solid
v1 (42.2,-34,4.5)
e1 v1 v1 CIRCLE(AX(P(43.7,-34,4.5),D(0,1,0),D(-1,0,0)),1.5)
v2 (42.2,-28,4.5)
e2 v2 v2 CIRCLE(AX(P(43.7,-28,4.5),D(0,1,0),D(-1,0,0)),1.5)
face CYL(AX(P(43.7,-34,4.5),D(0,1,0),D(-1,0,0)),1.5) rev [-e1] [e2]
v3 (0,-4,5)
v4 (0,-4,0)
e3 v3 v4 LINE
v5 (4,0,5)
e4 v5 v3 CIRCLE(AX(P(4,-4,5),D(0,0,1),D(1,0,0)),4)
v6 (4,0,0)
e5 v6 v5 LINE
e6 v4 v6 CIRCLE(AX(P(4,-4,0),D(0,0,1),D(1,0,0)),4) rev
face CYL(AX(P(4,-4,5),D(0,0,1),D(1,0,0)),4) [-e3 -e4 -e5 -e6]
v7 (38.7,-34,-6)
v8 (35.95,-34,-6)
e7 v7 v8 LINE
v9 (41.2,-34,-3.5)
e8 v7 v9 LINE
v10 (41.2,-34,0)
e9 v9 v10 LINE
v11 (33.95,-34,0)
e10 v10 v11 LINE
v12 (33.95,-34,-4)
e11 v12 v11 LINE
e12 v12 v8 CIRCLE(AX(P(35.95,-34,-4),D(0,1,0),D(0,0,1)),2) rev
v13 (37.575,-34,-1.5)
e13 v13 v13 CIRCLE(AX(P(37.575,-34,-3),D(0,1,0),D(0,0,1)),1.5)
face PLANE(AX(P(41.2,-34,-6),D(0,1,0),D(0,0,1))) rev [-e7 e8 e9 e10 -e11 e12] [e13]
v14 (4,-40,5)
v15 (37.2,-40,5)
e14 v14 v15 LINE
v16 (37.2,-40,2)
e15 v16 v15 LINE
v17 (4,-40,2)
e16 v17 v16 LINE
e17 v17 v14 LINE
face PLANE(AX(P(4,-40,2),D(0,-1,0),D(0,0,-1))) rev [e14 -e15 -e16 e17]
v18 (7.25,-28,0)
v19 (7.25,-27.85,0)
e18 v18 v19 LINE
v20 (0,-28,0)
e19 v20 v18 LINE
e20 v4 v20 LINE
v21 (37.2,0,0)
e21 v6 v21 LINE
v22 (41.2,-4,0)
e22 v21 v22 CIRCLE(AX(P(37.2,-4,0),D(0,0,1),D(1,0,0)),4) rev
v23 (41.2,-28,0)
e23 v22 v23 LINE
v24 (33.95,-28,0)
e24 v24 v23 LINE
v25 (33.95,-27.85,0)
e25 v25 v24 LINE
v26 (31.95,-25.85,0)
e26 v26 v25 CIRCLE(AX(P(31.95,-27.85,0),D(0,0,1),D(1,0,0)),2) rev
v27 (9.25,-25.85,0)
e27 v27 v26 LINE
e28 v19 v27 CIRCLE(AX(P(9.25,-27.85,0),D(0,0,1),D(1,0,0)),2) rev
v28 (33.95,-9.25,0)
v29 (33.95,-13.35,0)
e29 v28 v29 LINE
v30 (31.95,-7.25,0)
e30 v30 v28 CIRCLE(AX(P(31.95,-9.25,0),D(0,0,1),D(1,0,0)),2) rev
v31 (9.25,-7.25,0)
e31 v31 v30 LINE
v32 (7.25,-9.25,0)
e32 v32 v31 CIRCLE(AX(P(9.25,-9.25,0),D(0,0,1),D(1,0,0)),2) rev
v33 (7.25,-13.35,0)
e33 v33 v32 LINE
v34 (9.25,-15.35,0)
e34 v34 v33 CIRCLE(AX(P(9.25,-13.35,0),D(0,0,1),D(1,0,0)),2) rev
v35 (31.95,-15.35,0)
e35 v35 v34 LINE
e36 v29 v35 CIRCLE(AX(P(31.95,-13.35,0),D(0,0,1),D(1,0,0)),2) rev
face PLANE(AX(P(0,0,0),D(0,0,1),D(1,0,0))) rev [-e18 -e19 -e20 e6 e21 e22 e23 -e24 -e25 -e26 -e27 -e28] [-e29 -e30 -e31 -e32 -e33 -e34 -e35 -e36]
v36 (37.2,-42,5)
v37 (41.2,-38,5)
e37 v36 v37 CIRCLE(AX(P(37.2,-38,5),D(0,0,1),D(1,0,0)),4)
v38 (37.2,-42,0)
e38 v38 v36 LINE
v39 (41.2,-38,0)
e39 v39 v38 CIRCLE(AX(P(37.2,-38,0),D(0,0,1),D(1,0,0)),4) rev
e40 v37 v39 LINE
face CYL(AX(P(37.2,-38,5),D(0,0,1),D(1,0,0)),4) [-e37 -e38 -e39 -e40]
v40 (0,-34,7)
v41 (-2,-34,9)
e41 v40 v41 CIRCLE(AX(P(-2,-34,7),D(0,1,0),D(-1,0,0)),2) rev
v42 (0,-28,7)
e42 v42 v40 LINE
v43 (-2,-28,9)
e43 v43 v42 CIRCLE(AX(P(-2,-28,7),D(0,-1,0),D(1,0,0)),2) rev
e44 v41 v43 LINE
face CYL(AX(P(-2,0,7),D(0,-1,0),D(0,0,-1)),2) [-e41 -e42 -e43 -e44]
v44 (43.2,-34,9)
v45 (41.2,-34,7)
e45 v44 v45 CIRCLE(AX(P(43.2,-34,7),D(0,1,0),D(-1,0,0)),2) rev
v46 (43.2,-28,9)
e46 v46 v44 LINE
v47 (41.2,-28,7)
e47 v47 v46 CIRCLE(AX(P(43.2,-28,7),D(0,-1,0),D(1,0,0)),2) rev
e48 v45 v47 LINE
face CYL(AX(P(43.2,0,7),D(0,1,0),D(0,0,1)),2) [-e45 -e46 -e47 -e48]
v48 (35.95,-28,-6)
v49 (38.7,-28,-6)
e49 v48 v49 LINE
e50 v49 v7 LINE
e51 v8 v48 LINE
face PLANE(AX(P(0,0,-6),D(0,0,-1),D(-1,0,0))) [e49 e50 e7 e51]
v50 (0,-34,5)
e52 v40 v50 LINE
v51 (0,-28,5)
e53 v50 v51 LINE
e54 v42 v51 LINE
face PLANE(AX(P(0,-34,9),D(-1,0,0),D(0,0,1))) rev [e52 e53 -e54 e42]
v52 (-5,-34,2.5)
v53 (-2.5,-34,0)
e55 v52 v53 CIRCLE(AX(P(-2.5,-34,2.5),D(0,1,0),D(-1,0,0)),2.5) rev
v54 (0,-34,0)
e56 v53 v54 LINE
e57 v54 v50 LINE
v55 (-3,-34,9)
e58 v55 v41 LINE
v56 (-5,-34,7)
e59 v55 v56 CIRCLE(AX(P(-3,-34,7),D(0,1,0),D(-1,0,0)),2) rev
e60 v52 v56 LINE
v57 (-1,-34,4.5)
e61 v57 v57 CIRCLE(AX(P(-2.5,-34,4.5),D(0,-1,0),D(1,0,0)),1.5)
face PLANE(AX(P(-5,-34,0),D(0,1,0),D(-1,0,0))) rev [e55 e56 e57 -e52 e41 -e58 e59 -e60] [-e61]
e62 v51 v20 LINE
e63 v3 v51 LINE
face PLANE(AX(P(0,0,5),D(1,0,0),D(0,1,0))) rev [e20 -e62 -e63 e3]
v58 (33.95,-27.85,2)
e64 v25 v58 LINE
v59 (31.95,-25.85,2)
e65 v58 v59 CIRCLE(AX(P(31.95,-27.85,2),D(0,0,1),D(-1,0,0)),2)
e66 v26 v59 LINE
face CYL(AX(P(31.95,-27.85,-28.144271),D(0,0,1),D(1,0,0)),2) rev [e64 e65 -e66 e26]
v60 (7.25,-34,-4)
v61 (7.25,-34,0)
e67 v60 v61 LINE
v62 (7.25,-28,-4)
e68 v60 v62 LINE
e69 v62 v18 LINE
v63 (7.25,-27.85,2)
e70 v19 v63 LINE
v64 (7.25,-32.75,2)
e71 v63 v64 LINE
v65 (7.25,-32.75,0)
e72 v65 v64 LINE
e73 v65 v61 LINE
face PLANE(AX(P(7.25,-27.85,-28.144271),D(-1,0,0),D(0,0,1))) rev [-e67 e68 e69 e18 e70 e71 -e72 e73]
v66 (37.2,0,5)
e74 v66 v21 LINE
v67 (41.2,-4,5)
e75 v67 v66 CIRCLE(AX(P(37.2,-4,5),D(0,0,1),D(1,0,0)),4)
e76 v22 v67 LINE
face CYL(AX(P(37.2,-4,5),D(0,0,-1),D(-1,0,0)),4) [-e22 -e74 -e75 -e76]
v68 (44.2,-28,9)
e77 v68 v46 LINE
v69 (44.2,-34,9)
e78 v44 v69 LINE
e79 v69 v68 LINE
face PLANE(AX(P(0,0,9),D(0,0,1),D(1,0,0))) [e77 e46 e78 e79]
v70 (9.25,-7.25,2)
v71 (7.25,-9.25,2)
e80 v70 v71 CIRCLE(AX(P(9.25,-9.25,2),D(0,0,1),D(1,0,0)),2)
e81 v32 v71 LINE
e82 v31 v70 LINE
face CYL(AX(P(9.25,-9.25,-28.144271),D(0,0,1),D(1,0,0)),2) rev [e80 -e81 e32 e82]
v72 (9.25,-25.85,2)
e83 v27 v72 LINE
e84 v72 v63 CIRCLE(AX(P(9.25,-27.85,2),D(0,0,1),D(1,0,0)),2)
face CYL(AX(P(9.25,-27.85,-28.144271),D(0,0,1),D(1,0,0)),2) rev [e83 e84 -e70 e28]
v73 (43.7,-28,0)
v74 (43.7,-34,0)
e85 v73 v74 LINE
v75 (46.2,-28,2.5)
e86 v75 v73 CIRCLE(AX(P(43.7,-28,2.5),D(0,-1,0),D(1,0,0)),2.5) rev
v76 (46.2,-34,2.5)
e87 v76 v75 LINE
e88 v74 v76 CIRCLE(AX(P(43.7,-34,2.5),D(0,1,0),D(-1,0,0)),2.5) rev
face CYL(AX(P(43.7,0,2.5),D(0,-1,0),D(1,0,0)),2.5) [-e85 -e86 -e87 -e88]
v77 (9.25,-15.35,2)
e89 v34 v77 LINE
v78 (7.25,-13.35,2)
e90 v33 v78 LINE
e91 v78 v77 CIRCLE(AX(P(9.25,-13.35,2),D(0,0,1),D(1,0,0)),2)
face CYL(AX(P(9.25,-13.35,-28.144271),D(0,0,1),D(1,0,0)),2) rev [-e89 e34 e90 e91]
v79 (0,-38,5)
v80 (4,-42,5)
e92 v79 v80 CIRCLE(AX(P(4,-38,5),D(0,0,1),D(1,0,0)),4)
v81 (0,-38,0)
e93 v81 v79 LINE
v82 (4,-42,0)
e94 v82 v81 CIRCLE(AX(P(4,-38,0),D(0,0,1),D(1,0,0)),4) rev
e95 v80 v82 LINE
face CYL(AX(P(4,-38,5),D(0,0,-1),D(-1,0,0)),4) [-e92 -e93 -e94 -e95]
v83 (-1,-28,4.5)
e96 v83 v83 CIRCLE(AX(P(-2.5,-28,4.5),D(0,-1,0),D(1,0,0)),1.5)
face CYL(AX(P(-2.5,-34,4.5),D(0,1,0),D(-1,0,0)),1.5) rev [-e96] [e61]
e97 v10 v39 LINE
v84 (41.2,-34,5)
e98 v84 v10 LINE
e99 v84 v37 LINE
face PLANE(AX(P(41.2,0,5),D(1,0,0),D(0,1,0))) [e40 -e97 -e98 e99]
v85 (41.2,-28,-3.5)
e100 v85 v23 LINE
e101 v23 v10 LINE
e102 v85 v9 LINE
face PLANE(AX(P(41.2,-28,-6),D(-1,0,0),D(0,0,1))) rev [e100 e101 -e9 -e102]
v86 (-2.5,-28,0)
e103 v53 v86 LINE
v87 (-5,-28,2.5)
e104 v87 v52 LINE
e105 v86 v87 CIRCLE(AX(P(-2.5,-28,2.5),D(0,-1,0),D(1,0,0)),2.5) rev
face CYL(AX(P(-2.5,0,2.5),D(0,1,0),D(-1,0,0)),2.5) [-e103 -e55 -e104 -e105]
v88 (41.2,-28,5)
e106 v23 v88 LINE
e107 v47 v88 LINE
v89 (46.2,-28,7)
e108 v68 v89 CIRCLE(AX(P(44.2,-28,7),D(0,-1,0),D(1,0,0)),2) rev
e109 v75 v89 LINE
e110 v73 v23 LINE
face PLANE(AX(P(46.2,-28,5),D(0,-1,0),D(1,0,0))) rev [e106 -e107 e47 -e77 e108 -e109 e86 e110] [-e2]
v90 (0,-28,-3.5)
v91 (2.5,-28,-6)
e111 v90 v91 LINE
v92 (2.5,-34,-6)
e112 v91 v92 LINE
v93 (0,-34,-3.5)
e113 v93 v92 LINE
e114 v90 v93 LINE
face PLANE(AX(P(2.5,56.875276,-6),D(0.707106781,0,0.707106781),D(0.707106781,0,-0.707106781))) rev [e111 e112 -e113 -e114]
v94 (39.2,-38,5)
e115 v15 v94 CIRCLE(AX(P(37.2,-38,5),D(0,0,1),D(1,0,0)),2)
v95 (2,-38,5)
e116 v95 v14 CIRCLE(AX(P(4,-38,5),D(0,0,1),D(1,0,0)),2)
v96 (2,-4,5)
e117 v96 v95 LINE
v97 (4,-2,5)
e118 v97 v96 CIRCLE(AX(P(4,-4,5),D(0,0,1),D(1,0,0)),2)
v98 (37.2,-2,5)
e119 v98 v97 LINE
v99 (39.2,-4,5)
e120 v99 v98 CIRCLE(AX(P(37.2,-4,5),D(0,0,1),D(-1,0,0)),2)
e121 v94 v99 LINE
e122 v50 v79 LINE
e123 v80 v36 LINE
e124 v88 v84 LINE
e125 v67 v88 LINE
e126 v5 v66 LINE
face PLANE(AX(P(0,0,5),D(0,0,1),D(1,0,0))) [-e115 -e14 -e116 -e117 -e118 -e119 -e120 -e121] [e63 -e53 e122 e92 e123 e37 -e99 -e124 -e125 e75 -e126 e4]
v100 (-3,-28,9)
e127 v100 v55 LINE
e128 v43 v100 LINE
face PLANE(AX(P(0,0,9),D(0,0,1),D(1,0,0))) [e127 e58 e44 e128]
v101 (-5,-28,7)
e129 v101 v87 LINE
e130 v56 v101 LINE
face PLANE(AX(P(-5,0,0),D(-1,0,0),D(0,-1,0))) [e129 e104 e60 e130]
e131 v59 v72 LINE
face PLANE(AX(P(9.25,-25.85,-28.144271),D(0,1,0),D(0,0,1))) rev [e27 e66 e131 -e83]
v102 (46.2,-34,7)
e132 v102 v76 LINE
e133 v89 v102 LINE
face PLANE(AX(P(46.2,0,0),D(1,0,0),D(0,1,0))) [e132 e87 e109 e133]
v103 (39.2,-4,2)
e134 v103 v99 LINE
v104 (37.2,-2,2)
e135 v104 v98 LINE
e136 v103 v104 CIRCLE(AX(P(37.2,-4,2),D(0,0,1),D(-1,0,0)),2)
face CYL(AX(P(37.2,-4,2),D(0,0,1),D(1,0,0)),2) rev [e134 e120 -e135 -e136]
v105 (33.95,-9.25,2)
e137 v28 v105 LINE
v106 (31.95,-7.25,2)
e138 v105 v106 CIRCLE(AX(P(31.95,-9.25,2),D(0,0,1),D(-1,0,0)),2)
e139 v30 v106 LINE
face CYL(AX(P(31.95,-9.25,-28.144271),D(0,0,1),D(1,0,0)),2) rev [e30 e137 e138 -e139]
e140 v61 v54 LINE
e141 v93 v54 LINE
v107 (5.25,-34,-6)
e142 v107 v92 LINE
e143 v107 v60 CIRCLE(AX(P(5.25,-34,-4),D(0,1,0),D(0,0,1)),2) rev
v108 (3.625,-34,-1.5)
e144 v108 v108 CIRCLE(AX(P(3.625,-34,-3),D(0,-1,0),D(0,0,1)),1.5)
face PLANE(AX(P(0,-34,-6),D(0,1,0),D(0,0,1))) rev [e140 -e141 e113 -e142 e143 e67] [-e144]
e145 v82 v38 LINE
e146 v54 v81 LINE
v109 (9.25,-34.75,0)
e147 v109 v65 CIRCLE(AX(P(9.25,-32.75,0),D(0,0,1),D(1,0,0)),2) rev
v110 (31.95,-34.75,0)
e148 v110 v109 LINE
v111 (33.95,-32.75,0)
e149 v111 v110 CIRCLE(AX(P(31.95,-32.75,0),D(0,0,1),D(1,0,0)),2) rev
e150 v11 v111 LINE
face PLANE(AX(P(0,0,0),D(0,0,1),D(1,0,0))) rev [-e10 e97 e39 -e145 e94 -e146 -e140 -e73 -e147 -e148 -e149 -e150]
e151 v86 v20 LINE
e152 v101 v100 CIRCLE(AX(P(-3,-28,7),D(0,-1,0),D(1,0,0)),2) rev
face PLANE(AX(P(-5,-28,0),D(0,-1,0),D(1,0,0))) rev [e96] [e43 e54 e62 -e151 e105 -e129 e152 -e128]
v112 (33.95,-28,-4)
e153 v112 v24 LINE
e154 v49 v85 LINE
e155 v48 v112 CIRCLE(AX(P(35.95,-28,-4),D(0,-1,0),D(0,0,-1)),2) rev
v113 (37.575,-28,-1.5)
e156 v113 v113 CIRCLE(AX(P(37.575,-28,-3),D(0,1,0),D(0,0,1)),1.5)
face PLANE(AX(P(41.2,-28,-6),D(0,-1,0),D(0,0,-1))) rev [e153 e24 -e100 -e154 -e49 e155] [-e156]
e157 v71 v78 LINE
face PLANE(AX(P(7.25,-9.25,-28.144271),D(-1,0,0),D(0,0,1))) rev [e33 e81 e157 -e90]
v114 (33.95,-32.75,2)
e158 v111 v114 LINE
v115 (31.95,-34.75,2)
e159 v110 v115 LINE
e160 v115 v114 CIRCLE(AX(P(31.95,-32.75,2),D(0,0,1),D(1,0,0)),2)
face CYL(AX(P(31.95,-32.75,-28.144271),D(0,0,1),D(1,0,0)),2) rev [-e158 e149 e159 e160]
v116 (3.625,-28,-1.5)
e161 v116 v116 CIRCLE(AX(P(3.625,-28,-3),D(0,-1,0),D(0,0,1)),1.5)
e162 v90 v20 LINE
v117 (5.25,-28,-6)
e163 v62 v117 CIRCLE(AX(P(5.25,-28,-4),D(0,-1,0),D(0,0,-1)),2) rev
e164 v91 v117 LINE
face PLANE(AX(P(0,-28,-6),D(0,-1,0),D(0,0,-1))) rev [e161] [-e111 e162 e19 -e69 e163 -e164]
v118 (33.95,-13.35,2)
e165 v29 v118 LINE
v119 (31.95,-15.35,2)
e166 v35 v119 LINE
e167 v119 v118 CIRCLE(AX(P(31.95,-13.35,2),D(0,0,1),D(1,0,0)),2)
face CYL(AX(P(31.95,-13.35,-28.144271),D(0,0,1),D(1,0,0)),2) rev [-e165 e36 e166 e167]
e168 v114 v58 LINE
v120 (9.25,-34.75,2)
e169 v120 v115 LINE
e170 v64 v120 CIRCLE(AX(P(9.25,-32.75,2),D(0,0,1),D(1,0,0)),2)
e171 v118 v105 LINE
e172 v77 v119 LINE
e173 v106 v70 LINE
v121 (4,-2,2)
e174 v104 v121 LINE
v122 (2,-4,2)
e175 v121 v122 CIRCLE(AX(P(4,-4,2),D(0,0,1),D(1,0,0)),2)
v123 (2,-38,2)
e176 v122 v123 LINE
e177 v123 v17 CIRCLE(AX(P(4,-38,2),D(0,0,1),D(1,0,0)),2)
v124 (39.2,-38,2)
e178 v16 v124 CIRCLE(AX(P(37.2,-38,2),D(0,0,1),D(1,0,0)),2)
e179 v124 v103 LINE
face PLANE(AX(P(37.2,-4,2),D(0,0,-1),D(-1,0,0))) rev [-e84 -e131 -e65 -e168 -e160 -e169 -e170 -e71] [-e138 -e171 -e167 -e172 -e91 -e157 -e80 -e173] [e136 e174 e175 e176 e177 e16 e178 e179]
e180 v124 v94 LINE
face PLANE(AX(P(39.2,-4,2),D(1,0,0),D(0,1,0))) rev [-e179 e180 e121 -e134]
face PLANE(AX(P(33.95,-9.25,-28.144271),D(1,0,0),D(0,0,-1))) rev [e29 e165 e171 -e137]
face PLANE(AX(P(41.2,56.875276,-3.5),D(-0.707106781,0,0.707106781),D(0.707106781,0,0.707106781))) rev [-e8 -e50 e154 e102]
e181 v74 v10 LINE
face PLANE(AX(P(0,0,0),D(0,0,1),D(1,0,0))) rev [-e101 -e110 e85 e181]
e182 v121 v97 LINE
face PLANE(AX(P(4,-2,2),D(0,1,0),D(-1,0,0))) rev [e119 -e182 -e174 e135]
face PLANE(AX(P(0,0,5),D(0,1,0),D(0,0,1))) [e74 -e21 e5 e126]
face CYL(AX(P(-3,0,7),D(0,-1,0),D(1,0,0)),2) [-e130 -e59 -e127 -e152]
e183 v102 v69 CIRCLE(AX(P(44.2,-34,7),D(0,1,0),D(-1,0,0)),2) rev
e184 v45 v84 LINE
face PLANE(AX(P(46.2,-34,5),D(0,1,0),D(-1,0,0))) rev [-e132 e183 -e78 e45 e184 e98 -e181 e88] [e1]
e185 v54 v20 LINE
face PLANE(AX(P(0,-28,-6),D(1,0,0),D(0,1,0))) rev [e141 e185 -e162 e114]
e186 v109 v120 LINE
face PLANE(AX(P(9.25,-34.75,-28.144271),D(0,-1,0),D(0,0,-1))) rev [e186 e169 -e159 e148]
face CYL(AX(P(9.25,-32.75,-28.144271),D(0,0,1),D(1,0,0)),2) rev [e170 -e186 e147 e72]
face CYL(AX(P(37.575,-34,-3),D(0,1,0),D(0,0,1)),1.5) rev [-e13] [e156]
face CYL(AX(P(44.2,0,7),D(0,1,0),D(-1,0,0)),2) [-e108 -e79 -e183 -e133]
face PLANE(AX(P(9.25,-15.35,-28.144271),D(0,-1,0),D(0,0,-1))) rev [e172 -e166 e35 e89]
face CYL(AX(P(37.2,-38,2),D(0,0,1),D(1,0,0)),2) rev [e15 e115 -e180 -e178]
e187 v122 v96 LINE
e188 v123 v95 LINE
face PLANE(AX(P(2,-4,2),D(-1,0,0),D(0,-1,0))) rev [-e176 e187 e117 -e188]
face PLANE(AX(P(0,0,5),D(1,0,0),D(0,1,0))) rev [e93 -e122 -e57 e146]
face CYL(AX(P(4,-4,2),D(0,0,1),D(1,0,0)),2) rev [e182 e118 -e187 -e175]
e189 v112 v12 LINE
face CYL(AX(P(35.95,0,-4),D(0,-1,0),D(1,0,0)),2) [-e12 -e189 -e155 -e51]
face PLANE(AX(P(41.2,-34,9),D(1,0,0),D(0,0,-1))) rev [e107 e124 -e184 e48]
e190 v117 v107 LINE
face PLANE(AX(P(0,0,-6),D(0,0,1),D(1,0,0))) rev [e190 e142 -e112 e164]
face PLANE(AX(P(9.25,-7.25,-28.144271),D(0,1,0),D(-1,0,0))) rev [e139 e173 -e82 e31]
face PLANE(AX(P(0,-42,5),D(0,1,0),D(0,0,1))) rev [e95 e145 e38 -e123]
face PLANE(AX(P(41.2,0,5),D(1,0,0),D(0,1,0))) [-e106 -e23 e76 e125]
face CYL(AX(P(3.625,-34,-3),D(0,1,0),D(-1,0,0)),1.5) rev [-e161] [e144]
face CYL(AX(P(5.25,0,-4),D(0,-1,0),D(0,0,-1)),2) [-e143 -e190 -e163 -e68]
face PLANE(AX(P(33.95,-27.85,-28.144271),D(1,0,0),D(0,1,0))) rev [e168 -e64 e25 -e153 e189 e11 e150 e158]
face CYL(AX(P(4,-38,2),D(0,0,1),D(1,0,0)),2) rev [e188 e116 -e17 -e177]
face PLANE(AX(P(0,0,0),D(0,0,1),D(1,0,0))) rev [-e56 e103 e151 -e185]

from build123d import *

# Parameters (mm, degrees)
SKETCH1_W           = 41.2
SKETCH1_H           = 42
BOSS_EXTRUDE1_DEPTH = 5
CUT_EXTRUDE1_DEPTH  = 3
FILLET1_R           = 4
CUT_EXTRUDE2_DEPTH  = 2
SKETCH6_W           = 5
SKETCH6_H           = 6
BOSS_EXTRUDE2_DEPTH = 5
SKETCH7_W           = 5
SKETCH7_H           = 6
BOSS_EXTRUDE3_DEPTH = 5
SKETCH8_W           = 7.25
SKETCH8_H           = 6
BOSS_EXTRUDE4_DEPTH = 6
SKETCH9_W           = 7.25
SKETCH9_H           = 6
BOSS_EXTRUDE5_DEPTH = 6
SKETCH13_W          = 5
SKETCH13_H          = 6
BOSS_EXTRUDE6_DEPTH = 4
SKETCH10_R          = 1.5
CUT_EXTRUDE3_DEPTH  = 6
SKETCH12_R          = 1.5
CUT_EXTRUDE4_DEPTH  = 6
FILLET3_R           = 2
FILLET4_R           = 2.5
FILLET6_R           = 2
CUT_EXTRUDE6_START  = -6
CUT_EXTRUDE6_DEPTH  = 6
CUT_EXTRUDE7_START  = -6
CUT_EXTRUDE7_DEPTH  = 6


# Read off the part's stored shape, not the designer's step: Cut-Extrude6, Cut-Extrude7
with BuildPart() as part:
    # Sketch1 → Boss-Extrude1 (new body)
    with BuildSketch(Plane.XY):
        with Locations((20.6, -21)):
            Rectangle(SKETCH1_W, SKETCH1_H)
    extrude(amount=BOSS_EXTRUDE1_DEPTH)

    # Sketch2 → Cut-Extrude1 (cut)
    with BuildSketch(Plane.XY.offset(5)):
        with BuildLine():
            Line((4, -2), (37.2, -2))
            ThreePointArc((37.2, -2), (38.614213562, -2.585786438), (39.2, -4))
            Line((39.2, -4), (39.2, -38))
            ThreePointArc((39.2, -38), (38.614213562, -39.414213562), (37.2, -40))
            Line((37.2, -40), (4, -40))
            ThreePointArc((4, -40), (2.585786438, -39.414213562), (2, -38))
            Line((2, -38), (2, -4))
            ThreePointArc((2, -4), (2.585786438, -2.585786438), (4, -2))
        make_face()
    extrude(amount=-CUT_EXTRUDE1_DEPTH, mode=Mode.SUBTRACT)

    # Fillet1
    fillet1_edges = [part.edges().sort_by_distance(p)[0] for p in [
        (0, 0, 2.5),
        (41.2, 0, 2.5),
        (41.2, -42, 2.5),
        (0, -42, 2.5),
    ]]
    fillet(fillet1_edges, radius=FILLET1_R)

    # Sketch3 → Cut-Extrude2 (cut)
    with BuildSketch(Plane.XY.offset(2)):
        with BuildLine():
            Line((9.25, -7.25), (31.95, -7.25))
            ThreePointArc((31.95, -7.25), (33.364213562, -7.835786438), (33.95, -9.25))
            Line((33.95, -9.25), (33.95, -13.35))
            ThreePointArc((33.95, -13.35), (33.364213562, -14.764213562), (31.95, -15.35))
            Line((31.95, -15.35), (9.25, -15.35))
            ThreePointArc((9.25, -15.35), (7.835786438, -14.764213562), (7.25, -13.35))
            Line((7.25, -13.35), (7.25, -9.25))
            ThreePointArc((7.25, -9.25), (7.835786438, -7.835786438), (9.25, -7.25))
        make_face()
        with BuildLine():
            Line((9.25, -25.85), (31.95, -25.85))
            ThreePointArc((31.95, -25.85), (33.364213562, -26.435786438), (33.95, -27.85))
            Line((33.95, -27.85), (33.95, -32.75))
            ThreePointArc((33.95, -32.75), (33.364213562, -34.164213562), (31.95, -34.75))
            Line((31.95, -34.75), (9.25, -34.75))
            ThreePointArc((9.25, -34.75), (7.835786438, -34.164213562), (7.25, -32.75))
            Line((7.25, -32.75), (7.25, -27.85))
            ThreePointArc((7.25, -27.85), (7.835786438, -26.435786438), (9.25, -25.85))
        make_face()
    extrude(amount=-CUT_EXTRUDE2_DEPTH, mode=Mode.SUBTRACT)

    # Sketch6 → Boss-Extrude2 (add)
    with BuildSketch(Plane(origin=(41.2, 0, 0), x_dir=(0, 0, -1), z_dir=(1, 0, 0))):
        with Locations((-2.5, -31)):
            Rectangle(SKETCH6_W, SKETCH6_H)
    extrude(amount=BOSS_EXTRUDE2_DEPTH)

    # Sketch7 → Boss-Extrude3 (add)
    with BuildSketch(Plane.ZY):
        with Locations((2.5, -31)):
            Rectangle(SKETCH7_W, SKETCH7_H)
    extrude(amount=BOSS_EXTRUDE3_DEPTH)

    # Sketch8 → Boss-Extrude4 (add)
    with BuildSketch(Plane(origin=(0, 0, 0), x_dir=(-1, 0, 0), z_dir=(0, 0, -1))):
        with Locations((-37.575, -31)):
            Rectangle(SKETCH8_W, SKETCH8_H)
    extrude(amount=BOSS_EXTRUDE4_DEPTH)

    # Sketch9 → Boss-Extrude5 (add)
    with BuildSketch(Plane(origin=(0, 0, 0), x_dir=(-1, 0, 0), z_dir=(0, 0, -1))):
        with Locations((-3.625, -31)):
            Rectangle(SKETCH9_W, SKETCH9_H)
    extrude(amount=BOSS_EXTRUDE5_DEPTH)

    # Sketch13 → Boss-Extrude6 (add)
    with BuildSketch(Plane.XY.offset(5)):
        with Locations((43.7, -31)):
            Rectangle(SKETCH13_W, SKETCH13_H)
        with Locations((-2.5, -31)):
            Rectangle(SKETCH13_W, SKETCH13_H)
    extrude(amount=BOSS_EXTRUDE6_DEPTH)

    # Sketch10 → Cut-Extrude3 (cut)
    with BuildSketch(Plane(origin=(0, -28, 0), x_dir=(1, 0, 0), z_dir=(0, 1, 0))):
        with Locations(Location((43.7, -4.5, 0), (0, 0, 180))):
            Circle(SKETCH10_R)
    cut_extrude3 = extrude(amount=-CUT_EXTRUDE3_DEPTH, mode=Mode.SUBTRACT)

    # Mirror1: Cut-Extrude3 across plane
    add(cut_extrude3.mirror(Plane(origin=(20.6, 0, 0), x_dir=(0, 0, 1), z_dir=(1, 0, 0))), mode=Mode.SUBTRACT)

    # Sketch12 → Cut-Extrude4 (cut)
    with BuildSketch(Plane(origin=(0, -28, 0), x_dir=(1, 0, 0), z_dir=(0, 1, 0))):
        with Locations(Location((37.575, 3, 0), (0, 0, 270))):
            Circle(SKETCH12_R)
    cut_extrude4 = extrude(amount=-CUT_EXTRUDE4_DEPTH, mode=Mode.SUBTRACT)

    # Mirror2: Cut-Extrude4 across plane
    add(cut_extrude4.mirror(Plane(origin=(20.6, 0, 0), x_dir=(0, 0, 1), z_dir=(1, 0, 0))), mode=Mode.SUBTRACT)

    # Fillet3
    fillet3_edges = [part.edges().sort_by_distance(p)[0] for p in [
        (33.95, -31, -6),
        (7.25, -31, -6),
    ]]
    fillet(fillet3_edges, radius=FILLET3_R)

    # Fillet4
    fillet4_edges = [part.edges().sort_by_distance(p)[0] for p in [
        (46.2, -31, 0),
        (-5, -31, 0),
    ]]
    fillet(fillet4_edges, radius=FILLET4_R)

    # Fillet6
    fillet6_edges = [part.edges().sort_by_distance(p)[0] for p in [
        (46.2, -31, 9),
        (41.2, -31, 9),
        (0, -31, 9),
        (-5, -31, 9),
    ]]
    fillet(fillet6_edges, radius=FILLET6_R)

    # Cut-Extrude6 outline → Cut-Extrude6 (cut)
    with BuildSketch(Plane(origin=(0, -28, 0), x_dir=(1, 0, 0), z_dir=(0, 1, 0)).offset(CUT_EXTRUDE6_START)):
        Polygon((41.2, 6), (38.7, 6), (41.2, 3.5), align=None)
    extrude(amount=CUT_EXTRUDE6_DEPTH, mode=Mode.SUBTRACT)

    # Cut-Extrude7 outline → Cut-Extrude7 (cut)
    with BuildSketch(Plane(origin=(0, -28, 0), x_dir=(1, 0, 0), z_dir=(0, 1, 0)).offset(CUT_EXTRUDE7_START)):
        Polygon((0, 6), (0, 3.5), (2.5, 6), align=None)
    extrude(amount=CUT_EXTRUDE7_DEPTH, mode=Mode.SUBTRACT)


solid = part.part
